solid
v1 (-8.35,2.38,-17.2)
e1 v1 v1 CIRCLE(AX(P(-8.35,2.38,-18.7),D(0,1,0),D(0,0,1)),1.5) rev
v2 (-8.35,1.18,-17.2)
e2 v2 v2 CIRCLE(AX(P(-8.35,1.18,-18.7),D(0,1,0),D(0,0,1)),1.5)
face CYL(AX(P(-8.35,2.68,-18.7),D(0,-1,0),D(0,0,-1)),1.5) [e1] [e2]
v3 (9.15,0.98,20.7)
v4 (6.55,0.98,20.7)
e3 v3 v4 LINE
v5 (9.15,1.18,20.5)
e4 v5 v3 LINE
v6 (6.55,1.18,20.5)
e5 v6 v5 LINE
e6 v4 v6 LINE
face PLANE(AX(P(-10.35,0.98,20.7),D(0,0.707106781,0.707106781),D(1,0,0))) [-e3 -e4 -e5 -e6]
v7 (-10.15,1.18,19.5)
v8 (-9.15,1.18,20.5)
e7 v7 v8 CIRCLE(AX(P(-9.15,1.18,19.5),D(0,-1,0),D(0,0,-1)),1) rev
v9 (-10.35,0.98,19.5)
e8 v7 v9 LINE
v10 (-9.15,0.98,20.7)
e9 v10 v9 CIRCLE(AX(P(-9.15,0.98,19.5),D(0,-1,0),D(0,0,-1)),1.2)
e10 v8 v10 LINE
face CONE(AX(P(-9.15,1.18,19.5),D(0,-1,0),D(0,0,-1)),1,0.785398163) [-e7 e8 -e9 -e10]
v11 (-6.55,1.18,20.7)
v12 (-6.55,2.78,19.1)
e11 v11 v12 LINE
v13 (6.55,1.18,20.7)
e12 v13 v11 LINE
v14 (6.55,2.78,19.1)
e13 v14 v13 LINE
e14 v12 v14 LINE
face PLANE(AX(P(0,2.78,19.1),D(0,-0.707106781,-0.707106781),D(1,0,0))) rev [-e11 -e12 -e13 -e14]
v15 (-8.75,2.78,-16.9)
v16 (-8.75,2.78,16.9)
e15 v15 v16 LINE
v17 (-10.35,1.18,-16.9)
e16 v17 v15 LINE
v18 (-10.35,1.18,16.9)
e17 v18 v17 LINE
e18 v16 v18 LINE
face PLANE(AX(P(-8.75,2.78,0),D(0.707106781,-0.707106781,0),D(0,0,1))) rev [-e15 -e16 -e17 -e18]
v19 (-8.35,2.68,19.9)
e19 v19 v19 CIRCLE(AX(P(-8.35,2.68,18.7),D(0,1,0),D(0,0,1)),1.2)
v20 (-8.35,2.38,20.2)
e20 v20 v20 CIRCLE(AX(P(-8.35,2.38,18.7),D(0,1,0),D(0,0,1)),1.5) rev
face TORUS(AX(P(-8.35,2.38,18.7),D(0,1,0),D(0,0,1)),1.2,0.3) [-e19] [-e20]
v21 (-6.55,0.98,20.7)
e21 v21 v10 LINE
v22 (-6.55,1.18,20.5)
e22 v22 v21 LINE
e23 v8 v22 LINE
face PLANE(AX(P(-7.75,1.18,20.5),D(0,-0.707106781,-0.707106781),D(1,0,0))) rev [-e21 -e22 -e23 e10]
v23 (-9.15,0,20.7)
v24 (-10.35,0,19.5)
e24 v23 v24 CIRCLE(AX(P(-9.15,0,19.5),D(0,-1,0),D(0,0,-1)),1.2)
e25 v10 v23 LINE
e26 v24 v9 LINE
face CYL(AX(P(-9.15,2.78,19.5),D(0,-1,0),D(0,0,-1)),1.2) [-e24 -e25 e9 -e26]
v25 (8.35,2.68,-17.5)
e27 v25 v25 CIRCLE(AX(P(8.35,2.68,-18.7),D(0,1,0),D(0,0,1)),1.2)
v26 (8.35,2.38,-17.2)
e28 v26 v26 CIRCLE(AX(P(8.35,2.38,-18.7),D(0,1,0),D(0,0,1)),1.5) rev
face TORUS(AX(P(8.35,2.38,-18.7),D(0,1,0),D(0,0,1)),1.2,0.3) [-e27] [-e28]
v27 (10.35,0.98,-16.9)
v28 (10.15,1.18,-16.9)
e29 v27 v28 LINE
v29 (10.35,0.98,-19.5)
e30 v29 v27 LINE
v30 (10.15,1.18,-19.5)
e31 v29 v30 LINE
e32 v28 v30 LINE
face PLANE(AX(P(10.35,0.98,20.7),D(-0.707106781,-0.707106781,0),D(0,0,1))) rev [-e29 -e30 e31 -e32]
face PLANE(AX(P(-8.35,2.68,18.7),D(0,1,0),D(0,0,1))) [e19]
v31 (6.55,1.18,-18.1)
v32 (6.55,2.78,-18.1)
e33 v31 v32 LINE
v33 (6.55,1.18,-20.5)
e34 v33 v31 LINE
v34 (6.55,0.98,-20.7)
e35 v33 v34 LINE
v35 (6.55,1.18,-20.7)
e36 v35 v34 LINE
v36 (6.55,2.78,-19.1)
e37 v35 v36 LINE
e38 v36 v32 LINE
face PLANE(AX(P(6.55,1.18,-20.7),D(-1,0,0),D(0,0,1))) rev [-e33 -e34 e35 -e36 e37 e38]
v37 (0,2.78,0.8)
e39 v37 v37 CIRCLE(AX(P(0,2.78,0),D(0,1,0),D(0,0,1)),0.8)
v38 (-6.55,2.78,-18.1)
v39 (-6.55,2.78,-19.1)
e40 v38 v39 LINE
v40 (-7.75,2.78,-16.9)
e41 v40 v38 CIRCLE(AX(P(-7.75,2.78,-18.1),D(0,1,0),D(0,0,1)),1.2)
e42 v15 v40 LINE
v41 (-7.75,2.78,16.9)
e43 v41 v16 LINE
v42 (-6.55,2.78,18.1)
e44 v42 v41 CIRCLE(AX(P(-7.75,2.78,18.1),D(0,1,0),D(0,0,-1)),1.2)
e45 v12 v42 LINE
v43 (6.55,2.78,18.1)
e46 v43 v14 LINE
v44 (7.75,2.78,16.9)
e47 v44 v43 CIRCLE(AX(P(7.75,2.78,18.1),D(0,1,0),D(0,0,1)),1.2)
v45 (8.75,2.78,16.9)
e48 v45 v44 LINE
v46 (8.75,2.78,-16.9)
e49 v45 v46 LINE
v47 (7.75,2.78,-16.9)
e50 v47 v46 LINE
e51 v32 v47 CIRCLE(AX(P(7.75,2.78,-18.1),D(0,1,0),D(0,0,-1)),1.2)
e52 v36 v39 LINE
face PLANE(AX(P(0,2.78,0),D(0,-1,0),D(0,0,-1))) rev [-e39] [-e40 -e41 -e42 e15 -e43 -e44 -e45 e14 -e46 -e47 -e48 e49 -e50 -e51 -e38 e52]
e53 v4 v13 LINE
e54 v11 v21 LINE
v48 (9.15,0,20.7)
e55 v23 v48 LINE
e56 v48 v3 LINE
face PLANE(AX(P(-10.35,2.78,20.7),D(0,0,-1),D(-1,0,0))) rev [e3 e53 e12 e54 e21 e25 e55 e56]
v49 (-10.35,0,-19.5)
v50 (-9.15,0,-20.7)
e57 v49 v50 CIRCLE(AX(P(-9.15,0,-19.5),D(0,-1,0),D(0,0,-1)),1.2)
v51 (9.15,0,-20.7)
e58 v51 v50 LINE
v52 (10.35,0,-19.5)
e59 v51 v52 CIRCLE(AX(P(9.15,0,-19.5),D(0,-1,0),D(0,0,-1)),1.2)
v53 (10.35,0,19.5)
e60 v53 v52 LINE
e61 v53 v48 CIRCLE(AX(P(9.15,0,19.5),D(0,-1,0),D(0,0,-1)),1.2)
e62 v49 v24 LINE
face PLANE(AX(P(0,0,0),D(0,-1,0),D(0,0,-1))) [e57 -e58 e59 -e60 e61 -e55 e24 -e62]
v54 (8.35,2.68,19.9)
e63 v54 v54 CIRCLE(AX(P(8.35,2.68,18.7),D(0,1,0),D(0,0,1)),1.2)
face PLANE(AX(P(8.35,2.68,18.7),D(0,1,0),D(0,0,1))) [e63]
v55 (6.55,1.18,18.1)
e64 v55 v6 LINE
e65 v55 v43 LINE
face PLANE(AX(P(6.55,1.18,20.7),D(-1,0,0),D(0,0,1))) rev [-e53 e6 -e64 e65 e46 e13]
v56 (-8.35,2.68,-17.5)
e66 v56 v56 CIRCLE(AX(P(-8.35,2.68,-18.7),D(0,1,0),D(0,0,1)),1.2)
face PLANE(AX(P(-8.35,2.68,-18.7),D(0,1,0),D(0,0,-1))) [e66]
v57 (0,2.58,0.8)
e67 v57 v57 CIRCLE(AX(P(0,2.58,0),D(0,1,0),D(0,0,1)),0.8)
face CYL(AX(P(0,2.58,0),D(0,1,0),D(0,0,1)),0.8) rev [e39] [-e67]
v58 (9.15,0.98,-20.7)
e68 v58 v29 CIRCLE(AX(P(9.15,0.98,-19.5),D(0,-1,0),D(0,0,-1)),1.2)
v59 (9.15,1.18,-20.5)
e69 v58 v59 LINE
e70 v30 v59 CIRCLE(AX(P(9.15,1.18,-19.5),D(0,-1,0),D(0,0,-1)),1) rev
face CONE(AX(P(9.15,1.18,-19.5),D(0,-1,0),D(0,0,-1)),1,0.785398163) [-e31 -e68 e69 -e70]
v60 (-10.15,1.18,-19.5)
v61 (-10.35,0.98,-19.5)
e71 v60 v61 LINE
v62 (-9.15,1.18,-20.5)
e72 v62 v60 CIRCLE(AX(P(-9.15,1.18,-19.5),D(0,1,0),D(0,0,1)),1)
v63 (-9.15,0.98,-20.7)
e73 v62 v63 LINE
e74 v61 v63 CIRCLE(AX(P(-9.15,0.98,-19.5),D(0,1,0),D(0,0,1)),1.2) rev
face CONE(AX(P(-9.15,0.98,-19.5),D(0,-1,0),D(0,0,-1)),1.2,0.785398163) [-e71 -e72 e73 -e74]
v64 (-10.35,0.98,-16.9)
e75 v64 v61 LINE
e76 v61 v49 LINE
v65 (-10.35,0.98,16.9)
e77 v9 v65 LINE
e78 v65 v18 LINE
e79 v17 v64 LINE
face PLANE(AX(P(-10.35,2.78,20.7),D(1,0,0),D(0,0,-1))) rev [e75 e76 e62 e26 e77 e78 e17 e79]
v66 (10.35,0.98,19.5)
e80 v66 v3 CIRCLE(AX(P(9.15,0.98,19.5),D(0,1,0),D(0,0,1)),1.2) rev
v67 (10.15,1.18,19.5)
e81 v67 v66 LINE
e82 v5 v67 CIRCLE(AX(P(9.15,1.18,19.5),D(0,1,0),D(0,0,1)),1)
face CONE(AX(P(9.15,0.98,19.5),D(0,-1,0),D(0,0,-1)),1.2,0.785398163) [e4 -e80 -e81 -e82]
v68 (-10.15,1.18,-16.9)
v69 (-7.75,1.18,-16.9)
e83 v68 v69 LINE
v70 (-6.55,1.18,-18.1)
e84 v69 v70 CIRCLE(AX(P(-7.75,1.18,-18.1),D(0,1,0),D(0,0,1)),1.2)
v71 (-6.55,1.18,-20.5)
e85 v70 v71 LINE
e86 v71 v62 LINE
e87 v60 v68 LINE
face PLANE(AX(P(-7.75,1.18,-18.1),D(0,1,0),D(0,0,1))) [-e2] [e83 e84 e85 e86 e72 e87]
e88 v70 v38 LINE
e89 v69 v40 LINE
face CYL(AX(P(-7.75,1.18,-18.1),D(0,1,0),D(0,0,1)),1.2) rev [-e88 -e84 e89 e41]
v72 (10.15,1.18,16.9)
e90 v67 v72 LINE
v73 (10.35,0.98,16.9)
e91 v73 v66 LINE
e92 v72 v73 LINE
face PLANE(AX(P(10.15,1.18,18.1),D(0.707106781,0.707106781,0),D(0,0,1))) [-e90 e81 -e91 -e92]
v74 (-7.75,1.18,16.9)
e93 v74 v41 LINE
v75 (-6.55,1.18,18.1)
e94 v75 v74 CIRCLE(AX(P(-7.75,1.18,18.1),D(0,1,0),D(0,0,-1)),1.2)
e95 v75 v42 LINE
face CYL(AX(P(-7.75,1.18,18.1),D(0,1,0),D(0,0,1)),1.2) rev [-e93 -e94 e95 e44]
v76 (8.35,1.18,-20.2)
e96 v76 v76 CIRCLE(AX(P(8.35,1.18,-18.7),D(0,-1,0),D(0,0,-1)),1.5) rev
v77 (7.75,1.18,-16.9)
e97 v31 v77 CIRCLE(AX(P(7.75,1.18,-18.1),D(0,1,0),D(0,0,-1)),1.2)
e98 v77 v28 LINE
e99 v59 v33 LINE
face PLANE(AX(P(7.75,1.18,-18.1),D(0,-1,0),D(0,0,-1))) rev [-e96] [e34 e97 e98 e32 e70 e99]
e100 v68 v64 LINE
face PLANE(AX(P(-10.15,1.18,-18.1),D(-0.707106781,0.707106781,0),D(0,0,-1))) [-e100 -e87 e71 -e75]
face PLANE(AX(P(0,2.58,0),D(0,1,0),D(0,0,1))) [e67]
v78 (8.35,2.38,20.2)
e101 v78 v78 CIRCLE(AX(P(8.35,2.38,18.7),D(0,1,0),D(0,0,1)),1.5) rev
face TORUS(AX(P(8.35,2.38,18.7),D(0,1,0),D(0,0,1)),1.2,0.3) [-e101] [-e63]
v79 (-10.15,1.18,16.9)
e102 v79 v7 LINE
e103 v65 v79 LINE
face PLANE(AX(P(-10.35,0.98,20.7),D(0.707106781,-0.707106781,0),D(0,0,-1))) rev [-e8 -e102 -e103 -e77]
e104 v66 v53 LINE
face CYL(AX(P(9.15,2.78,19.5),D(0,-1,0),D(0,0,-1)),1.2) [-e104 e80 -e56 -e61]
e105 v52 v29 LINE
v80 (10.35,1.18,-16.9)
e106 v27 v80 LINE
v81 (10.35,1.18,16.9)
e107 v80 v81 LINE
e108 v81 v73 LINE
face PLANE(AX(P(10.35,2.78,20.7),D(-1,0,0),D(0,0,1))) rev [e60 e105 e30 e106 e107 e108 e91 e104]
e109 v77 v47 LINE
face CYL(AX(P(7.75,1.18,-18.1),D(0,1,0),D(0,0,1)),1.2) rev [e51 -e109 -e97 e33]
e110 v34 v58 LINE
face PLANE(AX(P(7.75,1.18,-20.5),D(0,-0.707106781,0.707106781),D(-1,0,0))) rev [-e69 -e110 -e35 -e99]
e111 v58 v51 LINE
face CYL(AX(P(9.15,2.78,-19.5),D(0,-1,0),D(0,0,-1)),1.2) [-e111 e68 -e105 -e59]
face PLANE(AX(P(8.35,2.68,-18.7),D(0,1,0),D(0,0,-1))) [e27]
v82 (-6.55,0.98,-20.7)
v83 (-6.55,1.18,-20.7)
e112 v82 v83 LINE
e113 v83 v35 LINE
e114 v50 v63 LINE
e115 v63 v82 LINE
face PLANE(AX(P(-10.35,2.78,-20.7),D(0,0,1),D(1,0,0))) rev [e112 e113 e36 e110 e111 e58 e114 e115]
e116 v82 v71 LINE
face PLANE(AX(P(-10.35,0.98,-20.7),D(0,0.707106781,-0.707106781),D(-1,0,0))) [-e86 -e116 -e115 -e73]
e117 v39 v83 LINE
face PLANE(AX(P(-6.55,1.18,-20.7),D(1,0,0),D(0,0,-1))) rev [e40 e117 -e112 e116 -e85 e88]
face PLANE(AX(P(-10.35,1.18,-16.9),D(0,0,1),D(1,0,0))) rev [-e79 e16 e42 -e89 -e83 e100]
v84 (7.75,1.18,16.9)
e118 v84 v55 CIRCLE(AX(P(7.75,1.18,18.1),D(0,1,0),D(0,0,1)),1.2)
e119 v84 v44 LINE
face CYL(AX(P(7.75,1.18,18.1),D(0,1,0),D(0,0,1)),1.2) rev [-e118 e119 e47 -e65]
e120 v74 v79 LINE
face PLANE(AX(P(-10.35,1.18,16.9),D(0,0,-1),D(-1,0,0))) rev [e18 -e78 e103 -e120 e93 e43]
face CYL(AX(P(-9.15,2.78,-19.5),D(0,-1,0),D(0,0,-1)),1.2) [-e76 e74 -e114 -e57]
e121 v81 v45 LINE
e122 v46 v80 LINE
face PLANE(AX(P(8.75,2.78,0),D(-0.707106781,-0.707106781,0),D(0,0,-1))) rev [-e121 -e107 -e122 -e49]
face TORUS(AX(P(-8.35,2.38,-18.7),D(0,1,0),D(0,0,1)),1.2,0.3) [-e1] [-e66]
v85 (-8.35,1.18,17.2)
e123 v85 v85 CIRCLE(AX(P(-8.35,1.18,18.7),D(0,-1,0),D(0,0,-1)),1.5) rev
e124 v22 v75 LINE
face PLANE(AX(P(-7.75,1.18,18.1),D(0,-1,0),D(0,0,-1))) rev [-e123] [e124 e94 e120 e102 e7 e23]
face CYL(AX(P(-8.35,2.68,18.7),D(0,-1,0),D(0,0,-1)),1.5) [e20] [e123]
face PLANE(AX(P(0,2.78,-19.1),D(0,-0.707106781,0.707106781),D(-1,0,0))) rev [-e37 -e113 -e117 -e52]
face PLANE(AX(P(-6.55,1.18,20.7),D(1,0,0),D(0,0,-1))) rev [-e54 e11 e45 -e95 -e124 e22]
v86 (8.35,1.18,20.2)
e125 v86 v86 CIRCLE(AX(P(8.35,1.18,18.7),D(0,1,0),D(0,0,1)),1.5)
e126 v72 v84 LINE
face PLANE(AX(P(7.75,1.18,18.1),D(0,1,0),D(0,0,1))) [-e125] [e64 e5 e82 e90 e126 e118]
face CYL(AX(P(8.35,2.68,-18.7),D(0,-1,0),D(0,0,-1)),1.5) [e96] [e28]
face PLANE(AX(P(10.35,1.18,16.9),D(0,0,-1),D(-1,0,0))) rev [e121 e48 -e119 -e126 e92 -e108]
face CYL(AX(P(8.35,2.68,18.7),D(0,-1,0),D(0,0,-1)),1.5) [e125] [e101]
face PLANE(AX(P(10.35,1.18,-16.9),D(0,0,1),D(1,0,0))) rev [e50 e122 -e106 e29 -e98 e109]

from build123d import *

# Parameters (mm, degrees)
CROQUIS1_W               = 20.7
CROQUIS1_H               = 41.4
SALIENTE_EXTRUIR1_DEPTH  = 2.78
CHAFL_N1_SIZE            = 1.6
CROQUIS4_R               = 0.8
CORTAR_EXTRUIR2_DEPTH    = 0.2
REDONDEO5_R              = 1.2
CORTAR_EXTRUIR5_DEPTH    = 1.6
CHAFL_N2_SIZE            = 0.2
CROQUIS10_R              = 1.5
SALIENTE_EXTRUIR2_DEPTH  = 1.5
REDONDEO6_R              = 0.3
REDONDEO6_OF_SIMETR_A1_R = 0.3


# Read off the part's stored shape, not the designer's step: Simetría4
with BuildPart() as part:
    # Croquis1 → Saliente-Extruir1 (new body)
    with BuildSketch(Plane(origin=(0, 0, 0), x_dir=(1, 0, 0), z_dir=(0, 1, 0))):
        Rectangle(CROQUIS1_W, CROQUIS1_H)
    extrude(amount=SALIENTE_EXTRUIR1_DEPTH)

    # Chaflán1
    chafl_n1_edges = [part.edges().sort_by_distance(p)[0] for p in [
        (-10.35, 2.78, 0),
        (0, 2.78, 20.7),
        (10.35, 2.78, 0),
        (0, 2.78, -20.7),
    ]]
    chamfer(chafl_n1_edges, length=CHAFL_N1_SIZE)

    # Croquis4 → Cortar-Extruir2 (cut)
    with BuildSketch(Plane(origin=(0, 2.78, 0), x_dir=(1, 0, 0), z_dir=(0, 1, 0))):
        with Locations(Location((0, 0, 0), (0, 0, 270))):
            Circle(CROQUIS4_R)
    extrude(amount=-CORTAR_EXTRUIR2_DEPTH, mode=Mode.SUBTRACT)

    # Redondeo5
    redondeo5_edges = [part.edges().sort_by_distance(p)[0] for p in [
        (10.35, 0.59, 20.7),
        (-10.35, 0.59, 20.7),
        (-10.35, 0.59, -20.7),
        (10.35, 0.59, -20.7),
    ]]
    fillet(redondeo5_edges, radius=REDONDEO5_R)

    # Croquis8 → Cortar-Extruir5 (cut)
    with BuildSketch(Plane(origin=(0, 2.78, 0), x_dir=(1, 0, 0), z_dir=(0, 1, 0))):
        with BuildLine():
            Line((-10.35, -20.7), (-6.55, -20.7))
            Line((-6.55, -20.7), (-6.55, -18.1))
            ThreePointArc((-6.55, -18.1), (-6.901471863, -17.251471863), (-7.75, -16.9))
            Line((-7.75, -16.9), (-10.35, -16.9))
            Line((-10.35, -16.9), (-10.35, -20.7))
        make_face()
        with BuildLine():
            Line((6.55, -20.7), (6.55, -18.1))
            ThreePointArc((6.55, -18.1), (6.901471863, -17.251471863), (7.75, -16.9))
            Line((7.75, -16.9), (10.35, -16.9))
            Line((10.35, -16.9), (10.35, -20.7))
            Line((10.35, -20.7), (6.55, -20.7))
        make_face()
        with BuildLine():
            Line((10.35, 20.7), (6.55, 20.7))
            Line((6.55, 20.7), (6.55, 18.1))
            ThreePointArc((6.55, 18.1), (6.901471863, 17.251471863), (7.75, 16.9))
            Line((7.75, 16.9), (10.35, 16.9))
            Line((10.35, 16.9), (10.35, 20.7))
        make_face()
        with BuildLine():
            Line((-6.55, 20.7), (-6.55, 18.1))
            ThreePointArc((-6.55, 18.1), (-6.901471863, 17.251471863), (-7.75, 16.9))
            Line((-7.75, 16.9), (-10.35, 16.9))
            Line((-10.35, 16.9), (-10.35, 20.7))
            Line((-10.35, 20.7), (-6.55, 20.7))
        make_face()
    extrude(amount=-CORTAR_EXTRUIR5_DEPTH, mode=Mode.SUBTRACT)

    # Chaflán2
    # the kernel refuses this chamfer: 0.2 mm, written as the material it takes off along each edge
    with BuildSketch(Plane(origin=(9.15, 1.18, -19.5), x_dir=(1, 0, 0), z_dir=(0, 0, 1))) as chafl_n2_piece_1:
        Polygon((1.2, -CHAFL_N2_SIZE), (1.2 - CHAFL_N2_SIZE, 0), (1.2, 0), align=None)
    revolve(axis=Axis((9.15, 1.18, -19.5), (0, 1, 0)), revolution_arc=90, mode=Mode.SUBTRACT)
    with BuildSketch(Plane(origin=(9.15, 1.18, -20.7), x_dir=(0, -0.999621916911297, -0.027495876610578732), z_dir=(-1, 0, 0)), Plane(origin=(-10.35, 1.18, -19.5), x_dir=(-0.02749587661058736, -0.9996219169112966, 0), z_dir=(0, 0, 1)), Plane(origin=(-6.55, 1.18, -20.7), x_dir=(0, -0.999621916911297, -0.027495876610578732), z_dir=(-1, 0, 0)), Plane(origin=(10.35, 1.18, -16.9), x_dir=(0.02749587661058736, -0.9996219169112966, 0), z_dir=(0, 0, -1)), Plane(origin=(6.55, 1.18, 20.7), x_dir=(0, -0.999621916911297, 0.027495876610578732), z_dir=(1, 0, 0)), Plane(origin=(-9.15, 1.18, 20.7), x_dir=(0, -0.999621916911297, 0.027495876610578732), z_dir=(1, 0, 0))) as chafl_n2_piece_2:
        Polygon((CHAFL_N2_SIZE * 0.999621916911, CHAFL_N2_SIZE * 0.0274958766106), (-CHAFL_N2_SIZE * 0.0274958766106, CHAFL_N2_SIZE * 0.999621916911), (0, 0), align=None)
    extrude(amount=2.6, mode=Mode.SUBTRACT)
    with BuildSketch(Plane(origin=(-9.15, 1.18, -19.5), x_dir=(0, 0, -1), z_dir=(1, 0, 0))) as chafl_n2_piece_3:
        Polygon((1.2, -CHAFL_N2_SIZE), (1.2 - CHAFL_N2_SIZE, 0), (1.2, 0), align=None)
    revolve(axis=Axis((-9.15, 1.18, -19.5), (0, 1, 0)), revolution_arc=90, mode=Mode.SUBTRACT)
    with BuildSketch(Plane(origin=(-10.35, 1.18, 16.9), x_dir=(0.9996219169112966, 0.02749587661058634, 0), z_dir=(0, 0, 1)), Plane(origin=(10.35, 1.18, 19.5), x_dir=(-0.9996219169112966, 0.02749587661058634, 0), z_dir=(0, 0, -1))) as chafl_n2_piece_4:
        Polygon((CHAFL_N2_SIZE * 0.999621916911, -CHAFL_N2_SIZE * 0.0274958766106), (-CHAFL_N2_SIZE * 0.0274958766106, -CHAFL_N2_SIZE * 0.999621916911), (0, 0), align=None)
    extrude(amount=2.6, mode=Mode.SUBTRACT)
    with BuildSketch(Plane(origin=(-9.15, 1.18, 19.5), x_dir=(-1, 0, 0), z_dir=(0, 0, -1))) as chafl_n2_piece_5:
        Polygon((1.2 - CHAFL_N2_SIZE, 0), (1.2, -CHAFL_N2_SIZE), (1.2, 0), align=None)
    revolve(axis=Axis((-9.15, 1.18, 19.5), (0, 1, 0)), revolution_arc=90, mode=Mode.SUBTRACT)
    with BuildSketch(Plane(origin=(9.15, 1.18, 19.5), x_dir=(0, 0, 1), z_dir=(-1, 0, 0))) as chafl_n2_piece_6:
        Polygon((1.2 - CHAFL_N2_SIZE, 0), (1.2, -CHAFL_N2_SIZE), (1.2, 0), align=None)
    revolve(axis=Axis((9.15, 1.18, 19.5), (0, 1, 0)), revolution_arc=90, mode=Mode.SUBTRACT)

    # Croquis10 → Saliente-Extruir2 (add)
    with BuildSketch(Plane(origin=(0, 1.18, 0), x_dir=(1, 0, 0), z_dir=(0, 1, 0))):
        with Locations(Location((-8.35, -18.7, 0), (0, 0, 90))):
            Circle(CROQUIS10_R)
    saliente_extruir2 = extrude(amount=SALIENTE_EXTRUIR2_DEPTH)

    # Redondeo6
    redondeo6_edges = [part.edges().sort_by_distance(p)[0] for p in [
        (-8.35, 2.68, 20.2),
    ]]
    fillet(redondeo6_edges, radius=REDONDEO6_R)

    # Simetría1: Saliente-Extruir2 across plane
    add(saliente_extruir2.mirror(Plane(origin=(0, 0, 0), x_dir=(0, 0, 1), z_dir=(1, 0, 0))))

    # Redondeo6 of Simetría1
    redondeo6_of_simetr_a1_edges = [part.edges().sort_by_distance(p)[0] for p in [
        (8.35, 2.68, 20.2),
    ]]
    fillet(redondeo6_of_simetr_a1_edges, radius=REDONDEO6_OF_SIMETR_A1_R)

    # Simetría4 outline → Simetría4 (revolve)
    with BuildSketch(Plane(origin=(8.35, 0, -18.7), x_dir=(1, 0, 0), z_dir=(0, 0, 1))):
        with BuildLine():
            Line((1.2, 2.68), (0, 2.68))
            Line((0, 2.68), (0, 1.18))
            Line((0, 1.18), (1.5, 1.18))
            Line((1.5, 1.18), (1.5, 2.38))
            ThreePointArc((1.5, 2.38), (1.412132034, 2.592132034), (1.2, 2.68))
        make_face()
    revolve(axis=Axis((8.35, 0, -18.7), (0, 1, 0)))

    # Simetr_a4 2 outline → Simetr_a4 2 (revolve)
    with BuildSketch(Plane(origin=(-8.35, 0, -18.7), x_dir=(1, 0, 0), z_dir=(0, 0, 1))):
        with BuildLine():
            Line((1.2, 2.68), (0, 2.68))
            Line((0, 2.68), (0, 1.18))
            Line((0, 1.18), (1.5, 1.18))
            Line((1.5, 1.18), (1.5, 2.38))
            ThreePointArc((1.5, 2.38), (1.412132034, 2.592132034), (1.2, 2.68))
        make_face()
    revolve(axis=Axis((-8.35, 0, -18.7), (0, 1, 0)))


solid = part.part
